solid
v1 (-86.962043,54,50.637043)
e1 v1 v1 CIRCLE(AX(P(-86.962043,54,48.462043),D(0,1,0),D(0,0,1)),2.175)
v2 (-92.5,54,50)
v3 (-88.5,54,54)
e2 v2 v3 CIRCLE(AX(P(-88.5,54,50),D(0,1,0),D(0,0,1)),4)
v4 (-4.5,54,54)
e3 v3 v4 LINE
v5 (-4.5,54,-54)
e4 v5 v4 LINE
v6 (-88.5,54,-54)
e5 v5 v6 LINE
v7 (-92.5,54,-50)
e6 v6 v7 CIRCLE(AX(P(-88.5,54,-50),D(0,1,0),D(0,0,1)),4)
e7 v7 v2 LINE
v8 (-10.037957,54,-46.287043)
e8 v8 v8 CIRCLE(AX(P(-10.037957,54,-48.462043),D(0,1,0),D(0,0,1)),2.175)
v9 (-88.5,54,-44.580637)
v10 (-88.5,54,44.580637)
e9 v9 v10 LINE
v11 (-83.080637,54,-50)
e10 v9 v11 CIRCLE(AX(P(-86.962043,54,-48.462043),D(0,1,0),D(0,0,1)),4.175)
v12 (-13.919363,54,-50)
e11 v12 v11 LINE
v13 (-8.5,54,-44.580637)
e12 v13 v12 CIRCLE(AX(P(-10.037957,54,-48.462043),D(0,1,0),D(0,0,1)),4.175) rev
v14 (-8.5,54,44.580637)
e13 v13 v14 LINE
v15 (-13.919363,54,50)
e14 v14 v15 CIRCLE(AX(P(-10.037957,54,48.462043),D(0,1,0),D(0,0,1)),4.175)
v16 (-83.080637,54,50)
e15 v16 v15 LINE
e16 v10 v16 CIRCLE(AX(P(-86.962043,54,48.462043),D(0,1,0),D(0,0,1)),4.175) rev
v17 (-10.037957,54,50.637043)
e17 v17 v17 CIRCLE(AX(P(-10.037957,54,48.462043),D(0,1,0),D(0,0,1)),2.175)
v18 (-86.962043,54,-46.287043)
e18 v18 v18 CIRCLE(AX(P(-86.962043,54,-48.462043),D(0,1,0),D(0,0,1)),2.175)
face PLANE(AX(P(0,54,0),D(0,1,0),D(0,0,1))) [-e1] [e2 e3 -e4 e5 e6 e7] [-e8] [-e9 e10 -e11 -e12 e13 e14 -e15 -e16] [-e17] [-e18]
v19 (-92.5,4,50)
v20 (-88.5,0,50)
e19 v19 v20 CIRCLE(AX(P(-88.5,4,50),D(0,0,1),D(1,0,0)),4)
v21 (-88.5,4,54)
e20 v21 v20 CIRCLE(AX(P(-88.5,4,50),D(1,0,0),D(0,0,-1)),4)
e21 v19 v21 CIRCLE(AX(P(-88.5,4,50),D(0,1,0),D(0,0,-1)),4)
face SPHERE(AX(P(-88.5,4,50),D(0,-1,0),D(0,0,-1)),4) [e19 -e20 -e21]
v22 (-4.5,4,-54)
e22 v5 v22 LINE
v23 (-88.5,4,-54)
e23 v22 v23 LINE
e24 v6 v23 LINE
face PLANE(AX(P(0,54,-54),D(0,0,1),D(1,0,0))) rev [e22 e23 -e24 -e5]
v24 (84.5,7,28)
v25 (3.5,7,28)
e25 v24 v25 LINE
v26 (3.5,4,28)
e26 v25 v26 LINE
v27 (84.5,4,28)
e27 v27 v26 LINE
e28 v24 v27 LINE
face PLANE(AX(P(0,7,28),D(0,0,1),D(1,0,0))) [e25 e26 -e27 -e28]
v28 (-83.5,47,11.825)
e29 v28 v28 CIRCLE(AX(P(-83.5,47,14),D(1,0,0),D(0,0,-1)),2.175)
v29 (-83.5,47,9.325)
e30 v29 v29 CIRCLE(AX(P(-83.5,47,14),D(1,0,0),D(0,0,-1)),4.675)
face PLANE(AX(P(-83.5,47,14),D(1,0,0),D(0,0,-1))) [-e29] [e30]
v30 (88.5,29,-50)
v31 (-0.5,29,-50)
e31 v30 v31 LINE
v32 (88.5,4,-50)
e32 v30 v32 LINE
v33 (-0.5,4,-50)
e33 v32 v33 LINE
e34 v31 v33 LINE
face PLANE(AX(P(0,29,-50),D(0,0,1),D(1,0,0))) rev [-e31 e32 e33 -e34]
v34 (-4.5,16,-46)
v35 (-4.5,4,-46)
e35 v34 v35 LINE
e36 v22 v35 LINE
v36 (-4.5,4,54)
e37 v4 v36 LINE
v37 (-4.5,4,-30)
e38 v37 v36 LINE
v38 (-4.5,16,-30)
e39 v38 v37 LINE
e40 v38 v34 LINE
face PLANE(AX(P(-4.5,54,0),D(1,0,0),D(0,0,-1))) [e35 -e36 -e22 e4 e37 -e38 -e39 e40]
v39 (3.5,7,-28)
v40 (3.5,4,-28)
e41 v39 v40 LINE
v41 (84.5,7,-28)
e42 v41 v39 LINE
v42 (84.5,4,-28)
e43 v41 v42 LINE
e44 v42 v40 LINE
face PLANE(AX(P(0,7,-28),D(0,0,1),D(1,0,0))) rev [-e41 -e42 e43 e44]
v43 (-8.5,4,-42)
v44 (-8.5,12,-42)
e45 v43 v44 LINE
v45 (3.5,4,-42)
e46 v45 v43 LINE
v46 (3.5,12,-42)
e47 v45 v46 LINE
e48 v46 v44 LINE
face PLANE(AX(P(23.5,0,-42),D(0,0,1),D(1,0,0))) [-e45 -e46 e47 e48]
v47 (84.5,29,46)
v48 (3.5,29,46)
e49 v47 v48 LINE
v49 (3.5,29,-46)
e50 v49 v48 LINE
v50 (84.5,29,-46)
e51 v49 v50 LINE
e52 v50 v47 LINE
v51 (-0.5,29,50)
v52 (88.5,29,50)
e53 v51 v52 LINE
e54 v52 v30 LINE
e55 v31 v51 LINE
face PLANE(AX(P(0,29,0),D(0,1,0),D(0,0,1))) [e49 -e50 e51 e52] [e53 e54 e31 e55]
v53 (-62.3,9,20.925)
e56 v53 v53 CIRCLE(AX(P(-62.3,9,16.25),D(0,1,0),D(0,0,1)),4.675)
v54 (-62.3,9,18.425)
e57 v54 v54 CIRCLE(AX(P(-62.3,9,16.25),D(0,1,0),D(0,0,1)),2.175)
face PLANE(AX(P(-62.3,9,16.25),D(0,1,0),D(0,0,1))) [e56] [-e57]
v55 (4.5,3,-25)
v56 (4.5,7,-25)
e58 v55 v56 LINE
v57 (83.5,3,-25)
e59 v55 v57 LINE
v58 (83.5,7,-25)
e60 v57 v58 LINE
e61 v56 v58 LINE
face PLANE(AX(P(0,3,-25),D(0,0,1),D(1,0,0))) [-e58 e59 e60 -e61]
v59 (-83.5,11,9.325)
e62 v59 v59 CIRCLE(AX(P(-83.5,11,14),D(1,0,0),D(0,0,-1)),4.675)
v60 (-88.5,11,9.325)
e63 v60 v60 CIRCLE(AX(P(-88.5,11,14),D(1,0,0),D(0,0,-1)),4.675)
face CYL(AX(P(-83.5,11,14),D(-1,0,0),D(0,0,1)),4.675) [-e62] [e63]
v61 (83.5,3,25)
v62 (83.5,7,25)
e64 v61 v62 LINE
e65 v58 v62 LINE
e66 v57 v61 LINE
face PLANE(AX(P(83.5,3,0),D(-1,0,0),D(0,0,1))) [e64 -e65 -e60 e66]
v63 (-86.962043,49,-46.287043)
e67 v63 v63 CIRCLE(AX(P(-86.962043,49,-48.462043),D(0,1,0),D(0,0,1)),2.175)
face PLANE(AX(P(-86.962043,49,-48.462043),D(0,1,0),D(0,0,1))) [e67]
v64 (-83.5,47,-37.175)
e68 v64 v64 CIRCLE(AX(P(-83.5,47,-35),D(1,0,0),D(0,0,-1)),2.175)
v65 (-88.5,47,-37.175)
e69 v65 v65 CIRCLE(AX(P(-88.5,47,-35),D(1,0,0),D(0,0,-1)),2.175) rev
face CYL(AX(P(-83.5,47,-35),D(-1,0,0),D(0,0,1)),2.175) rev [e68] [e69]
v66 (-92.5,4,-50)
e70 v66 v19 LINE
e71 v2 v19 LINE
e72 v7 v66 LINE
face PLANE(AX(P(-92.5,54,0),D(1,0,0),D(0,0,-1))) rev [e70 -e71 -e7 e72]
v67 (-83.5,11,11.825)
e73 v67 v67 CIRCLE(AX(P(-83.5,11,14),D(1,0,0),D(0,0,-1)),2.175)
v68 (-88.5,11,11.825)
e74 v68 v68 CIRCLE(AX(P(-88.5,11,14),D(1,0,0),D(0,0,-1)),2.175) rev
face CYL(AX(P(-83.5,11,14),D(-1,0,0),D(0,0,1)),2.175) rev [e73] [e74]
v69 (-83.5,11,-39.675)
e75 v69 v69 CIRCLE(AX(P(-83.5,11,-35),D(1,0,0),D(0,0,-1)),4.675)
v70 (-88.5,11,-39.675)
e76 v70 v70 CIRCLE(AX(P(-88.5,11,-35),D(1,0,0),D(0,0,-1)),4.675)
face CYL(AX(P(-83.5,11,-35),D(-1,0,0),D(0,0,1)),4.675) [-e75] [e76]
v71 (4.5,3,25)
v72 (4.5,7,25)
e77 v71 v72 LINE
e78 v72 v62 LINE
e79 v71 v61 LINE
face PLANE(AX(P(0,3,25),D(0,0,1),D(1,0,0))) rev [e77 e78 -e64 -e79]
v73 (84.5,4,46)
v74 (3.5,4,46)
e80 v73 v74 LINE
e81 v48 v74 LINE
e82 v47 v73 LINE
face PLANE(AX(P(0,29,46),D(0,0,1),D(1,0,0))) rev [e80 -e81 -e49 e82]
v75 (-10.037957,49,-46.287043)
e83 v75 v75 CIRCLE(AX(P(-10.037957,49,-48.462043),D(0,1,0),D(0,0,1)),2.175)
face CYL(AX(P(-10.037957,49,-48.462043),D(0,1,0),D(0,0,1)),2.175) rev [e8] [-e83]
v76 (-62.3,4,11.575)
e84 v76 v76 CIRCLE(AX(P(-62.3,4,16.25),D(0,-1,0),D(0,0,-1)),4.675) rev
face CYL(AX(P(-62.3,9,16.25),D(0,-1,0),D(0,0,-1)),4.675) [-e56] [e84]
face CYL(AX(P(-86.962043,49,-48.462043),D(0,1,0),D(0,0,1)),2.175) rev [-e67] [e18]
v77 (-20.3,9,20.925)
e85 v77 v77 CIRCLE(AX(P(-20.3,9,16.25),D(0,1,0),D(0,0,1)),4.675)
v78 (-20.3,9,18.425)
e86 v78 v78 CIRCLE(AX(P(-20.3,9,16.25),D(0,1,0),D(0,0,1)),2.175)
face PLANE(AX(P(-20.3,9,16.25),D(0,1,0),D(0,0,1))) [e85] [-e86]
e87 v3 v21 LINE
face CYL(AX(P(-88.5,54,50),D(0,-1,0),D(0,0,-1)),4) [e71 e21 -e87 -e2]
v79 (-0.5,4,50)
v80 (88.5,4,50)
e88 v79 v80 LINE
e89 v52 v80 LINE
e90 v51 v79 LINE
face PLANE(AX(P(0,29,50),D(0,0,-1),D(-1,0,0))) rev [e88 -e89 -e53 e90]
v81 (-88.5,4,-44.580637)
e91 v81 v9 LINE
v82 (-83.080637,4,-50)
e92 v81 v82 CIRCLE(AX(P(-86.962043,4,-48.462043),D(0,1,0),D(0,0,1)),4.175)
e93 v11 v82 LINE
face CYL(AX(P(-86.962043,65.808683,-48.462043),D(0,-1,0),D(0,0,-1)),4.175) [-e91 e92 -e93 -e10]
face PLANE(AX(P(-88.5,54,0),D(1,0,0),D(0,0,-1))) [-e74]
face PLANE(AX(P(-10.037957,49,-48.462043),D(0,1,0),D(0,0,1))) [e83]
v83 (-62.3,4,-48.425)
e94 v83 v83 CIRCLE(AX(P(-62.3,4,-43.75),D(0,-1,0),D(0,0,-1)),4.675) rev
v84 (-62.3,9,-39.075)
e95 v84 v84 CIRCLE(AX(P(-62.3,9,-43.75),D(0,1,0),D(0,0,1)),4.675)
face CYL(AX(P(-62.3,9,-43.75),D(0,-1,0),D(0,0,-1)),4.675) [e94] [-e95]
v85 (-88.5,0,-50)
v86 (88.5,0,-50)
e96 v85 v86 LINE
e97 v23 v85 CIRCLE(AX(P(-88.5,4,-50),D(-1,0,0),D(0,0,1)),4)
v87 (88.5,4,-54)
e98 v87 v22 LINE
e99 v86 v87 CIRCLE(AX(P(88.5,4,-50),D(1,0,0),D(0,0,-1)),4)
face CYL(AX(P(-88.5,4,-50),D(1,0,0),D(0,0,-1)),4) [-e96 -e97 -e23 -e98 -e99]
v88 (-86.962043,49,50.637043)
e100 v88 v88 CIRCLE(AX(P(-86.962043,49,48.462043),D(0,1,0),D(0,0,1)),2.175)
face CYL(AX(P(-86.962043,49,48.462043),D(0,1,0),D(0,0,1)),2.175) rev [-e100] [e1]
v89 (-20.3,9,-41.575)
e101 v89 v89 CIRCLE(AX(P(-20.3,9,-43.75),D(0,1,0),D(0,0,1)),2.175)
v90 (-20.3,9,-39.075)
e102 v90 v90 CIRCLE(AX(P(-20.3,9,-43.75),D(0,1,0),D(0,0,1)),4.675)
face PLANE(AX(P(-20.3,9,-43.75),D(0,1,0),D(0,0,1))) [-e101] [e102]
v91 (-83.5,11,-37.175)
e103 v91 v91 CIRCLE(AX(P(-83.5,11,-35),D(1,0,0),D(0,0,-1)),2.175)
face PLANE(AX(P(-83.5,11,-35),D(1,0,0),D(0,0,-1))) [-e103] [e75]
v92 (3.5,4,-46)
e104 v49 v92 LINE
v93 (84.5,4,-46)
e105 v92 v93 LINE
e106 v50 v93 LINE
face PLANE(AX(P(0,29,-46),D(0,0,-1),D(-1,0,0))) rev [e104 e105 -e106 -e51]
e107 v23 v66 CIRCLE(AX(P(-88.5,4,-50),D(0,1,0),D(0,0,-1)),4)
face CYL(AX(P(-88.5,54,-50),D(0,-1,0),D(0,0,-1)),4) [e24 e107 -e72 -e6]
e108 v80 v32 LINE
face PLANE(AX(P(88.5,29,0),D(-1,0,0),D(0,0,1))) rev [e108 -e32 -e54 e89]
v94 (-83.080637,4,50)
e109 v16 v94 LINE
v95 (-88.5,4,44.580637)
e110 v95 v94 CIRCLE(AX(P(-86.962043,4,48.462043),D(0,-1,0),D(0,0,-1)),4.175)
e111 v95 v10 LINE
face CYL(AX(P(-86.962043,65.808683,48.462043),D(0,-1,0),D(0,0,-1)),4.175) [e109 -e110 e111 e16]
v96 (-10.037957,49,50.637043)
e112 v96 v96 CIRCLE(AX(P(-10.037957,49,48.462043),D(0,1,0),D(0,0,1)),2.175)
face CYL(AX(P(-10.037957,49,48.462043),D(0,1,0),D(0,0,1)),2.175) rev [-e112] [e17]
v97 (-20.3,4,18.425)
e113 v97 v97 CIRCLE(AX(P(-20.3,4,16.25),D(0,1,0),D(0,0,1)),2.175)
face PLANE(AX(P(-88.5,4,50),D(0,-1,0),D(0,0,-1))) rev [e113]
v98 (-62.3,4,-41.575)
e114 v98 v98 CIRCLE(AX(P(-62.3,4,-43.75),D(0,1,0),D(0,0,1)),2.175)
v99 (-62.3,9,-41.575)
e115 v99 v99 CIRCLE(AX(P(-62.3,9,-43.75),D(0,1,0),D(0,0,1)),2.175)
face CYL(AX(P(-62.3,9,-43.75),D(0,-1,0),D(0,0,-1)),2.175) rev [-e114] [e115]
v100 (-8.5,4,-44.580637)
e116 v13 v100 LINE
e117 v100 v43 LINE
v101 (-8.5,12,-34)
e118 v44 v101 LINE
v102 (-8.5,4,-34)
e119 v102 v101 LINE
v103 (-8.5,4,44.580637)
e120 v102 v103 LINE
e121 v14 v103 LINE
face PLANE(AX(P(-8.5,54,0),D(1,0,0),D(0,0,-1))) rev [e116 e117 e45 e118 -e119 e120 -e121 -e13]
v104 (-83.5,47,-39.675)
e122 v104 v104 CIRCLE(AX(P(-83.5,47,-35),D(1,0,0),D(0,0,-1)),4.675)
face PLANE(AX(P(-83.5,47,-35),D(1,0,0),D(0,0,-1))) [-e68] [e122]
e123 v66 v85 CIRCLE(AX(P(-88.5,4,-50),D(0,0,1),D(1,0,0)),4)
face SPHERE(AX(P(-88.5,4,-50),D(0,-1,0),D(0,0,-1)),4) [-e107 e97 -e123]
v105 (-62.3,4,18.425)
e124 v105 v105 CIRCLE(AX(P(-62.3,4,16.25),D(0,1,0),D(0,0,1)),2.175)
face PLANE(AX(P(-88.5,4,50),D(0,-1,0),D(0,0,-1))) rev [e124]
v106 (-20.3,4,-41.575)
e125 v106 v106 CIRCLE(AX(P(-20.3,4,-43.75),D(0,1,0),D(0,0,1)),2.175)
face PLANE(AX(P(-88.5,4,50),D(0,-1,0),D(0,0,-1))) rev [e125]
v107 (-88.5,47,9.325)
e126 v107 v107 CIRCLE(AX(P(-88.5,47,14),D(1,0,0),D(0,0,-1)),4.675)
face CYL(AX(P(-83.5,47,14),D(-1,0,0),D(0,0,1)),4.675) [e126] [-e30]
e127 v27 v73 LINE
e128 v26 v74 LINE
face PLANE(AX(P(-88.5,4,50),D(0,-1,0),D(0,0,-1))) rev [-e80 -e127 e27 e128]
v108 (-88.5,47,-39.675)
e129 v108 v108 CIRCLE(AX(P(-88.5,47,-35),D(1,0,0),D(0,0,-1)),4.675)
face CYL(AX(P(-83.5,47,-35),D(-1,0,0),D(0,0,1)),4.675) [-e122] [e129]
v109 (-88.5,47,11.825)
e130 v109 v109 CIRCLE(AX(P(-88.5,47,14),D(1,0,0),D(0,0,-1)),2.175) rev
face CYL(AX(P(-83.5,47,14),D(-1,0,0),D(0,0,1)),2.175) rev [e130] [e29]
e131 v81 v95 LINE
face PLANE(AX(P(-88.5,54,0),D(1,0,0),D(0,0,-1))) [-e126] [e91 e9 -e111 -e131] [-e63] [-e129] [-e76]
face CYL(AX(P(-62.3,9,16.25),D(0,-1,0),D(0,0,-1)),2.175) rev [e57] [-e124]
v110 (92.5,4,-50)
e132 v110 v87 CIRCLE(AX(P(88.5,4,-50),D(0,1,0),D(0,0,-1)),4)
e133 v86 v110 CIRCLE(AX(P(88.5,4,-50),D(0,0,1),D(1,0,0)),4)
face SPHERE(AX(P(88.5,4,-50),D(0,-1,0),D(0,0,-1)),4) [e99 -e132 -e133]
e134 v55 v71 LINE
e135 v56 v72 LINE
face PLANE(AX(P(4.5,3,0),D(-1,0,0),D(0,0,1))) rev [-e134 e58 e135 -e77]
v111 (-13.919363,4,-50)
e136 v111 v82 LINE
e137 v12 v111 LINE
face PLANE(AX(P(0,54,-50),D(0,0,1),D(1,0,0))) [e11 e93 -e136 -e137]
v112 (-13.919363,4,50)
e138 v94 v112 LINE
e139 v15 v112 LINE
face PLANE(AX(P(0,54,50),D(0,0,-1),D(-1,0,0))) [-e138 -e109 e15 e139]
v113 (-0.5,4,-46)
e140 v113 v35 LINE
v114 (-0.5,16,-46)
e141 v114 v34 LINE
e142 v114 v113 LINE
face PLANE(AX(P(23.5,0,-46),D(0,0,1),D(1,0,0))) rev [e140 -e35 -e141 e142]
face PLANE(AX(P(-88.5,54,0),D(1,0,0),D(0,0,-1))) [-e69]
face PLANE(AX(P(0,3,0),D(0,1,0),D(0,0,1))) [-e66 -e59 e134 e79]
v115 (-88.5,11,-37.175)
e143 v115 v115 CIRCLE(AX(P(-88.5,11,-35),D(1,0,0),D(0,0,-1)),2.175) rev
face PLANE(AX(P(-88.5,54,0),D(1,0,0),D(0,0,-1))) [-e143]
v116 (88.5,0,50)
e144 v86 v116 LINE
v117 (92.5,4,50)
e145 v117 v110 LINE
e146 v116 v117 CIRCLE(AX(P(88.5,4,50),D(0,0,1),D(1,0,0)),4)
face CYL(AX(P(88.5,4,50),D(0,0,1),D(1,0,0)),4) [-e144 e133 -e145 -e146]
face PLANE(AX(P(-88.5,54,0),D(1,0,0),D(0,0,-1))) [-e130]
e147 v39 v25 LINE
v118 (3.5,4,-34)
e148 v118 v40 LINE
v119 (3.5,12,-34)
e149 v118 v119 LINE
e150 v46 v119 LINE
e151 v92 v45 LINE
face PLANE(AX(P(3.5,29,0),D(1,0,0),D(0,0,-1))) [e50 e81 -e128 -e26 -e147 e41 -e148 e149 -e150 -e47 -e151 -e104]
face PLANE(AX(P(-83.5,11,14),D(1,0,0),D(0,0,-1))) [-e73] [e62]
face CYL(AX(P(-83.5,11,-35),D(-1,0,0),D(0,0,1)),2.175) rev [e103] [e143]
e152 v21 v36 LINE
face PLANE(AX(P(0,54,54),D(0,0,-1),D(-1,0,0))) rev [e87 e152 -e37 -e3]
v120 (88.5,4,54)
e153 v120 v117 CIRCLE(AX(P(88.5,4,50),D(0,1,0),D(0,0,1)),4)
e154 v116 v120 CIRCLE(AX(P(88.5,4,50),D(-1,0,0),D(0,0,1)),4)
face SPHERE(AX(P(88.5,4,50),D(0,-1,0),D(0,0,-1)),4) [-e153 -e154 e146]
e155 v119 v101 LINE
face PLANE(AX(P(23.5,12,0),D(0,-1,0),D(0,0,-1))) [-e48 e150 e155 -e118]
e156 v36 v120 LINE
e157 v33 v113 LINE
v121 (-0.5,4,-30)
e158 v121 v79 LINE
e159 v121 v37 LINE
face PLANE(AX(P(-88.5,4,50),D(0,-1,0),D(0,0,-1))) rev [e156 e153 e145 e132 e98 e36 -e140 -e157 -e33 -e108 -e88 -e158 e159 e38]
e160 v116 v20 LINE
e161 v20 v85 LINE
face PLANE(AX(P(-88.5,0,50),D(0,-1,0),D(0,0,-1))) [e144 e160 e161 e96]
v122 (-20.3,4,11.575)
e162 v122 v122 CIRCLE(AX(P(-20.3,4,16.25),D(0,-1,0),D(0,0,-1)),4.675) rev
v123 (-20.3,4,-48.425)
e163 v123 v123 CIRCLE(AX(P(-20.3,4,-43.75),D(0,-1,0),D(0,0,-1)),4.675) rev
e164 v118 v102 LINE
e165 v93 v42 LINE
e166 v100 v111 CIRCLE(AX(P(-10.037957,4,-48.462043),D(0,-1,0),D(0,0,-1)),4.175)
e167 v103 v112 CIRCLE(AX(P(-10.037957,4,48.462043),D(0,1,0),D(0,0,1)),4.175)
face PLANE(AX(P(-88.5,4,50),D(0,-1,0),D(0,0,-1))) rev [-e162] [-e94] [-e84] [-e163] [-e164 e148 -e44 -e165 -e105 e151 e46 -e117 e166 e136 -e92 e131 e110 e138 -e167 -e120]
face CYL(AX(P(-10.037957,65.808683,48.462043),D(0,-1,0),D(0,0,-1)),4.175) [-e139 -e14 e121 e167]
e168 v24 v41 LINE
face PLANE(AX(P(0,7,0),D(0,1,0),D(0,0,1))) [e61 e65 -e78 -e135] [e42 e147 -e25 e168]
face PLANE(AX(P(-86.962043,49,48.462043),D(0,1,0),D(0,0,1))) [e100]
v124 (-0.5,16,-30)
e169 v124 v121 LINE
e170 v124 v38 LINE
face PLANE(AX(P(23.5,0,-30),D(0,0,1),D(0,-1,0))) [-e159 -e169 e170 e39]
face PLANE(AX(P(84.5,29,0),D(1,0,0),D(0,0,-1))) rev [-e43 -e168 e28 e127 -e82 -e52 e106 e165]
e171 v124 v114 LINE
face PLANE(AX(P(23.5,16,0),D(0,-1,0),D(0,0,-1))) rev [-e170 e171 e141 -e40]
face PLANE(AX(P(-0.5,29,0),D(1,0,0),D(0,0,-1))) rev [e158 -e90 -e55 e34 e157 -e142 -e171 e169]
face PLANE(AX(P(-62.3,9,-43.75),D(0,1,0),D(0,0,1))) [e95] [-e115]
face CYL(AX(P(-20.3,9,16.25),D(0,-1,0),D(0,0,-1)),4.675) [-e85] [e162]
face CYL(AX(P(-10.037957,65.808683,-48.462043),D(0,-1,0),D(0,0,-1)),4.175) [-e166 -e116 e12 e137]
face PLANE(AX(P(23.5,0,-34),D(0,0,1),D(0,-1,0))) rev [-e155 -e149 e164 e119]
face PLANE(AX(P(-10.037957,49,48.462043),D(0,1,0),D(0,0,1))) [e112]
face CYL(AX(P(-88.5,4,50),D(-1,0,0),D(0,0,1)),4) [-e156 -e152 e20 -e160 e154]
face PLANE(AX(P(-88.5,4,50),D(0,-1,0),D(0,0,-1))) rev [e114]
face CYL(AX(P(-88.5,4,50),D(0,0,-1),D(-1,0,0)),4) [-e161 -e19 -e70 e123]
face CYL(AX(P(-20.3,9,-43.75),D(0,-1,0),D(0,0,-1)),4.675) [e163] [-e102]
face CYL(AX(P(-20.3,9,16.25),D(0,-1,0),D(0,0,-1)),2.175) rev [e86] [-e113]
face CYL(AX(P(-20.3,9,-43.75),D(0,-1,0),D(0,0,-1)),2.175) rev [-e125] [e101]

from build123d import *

# Parameters (mm, degrees)
BOSS_EXTRUDE1_DEPTH = 4
FILLET1_R           = 4
SKETCH4_W           = 4
SKETCH4_H           = 4
SKETCH4_H_2         = 100
BOSS_EXTRUDE2_DEPTH = 50
BOSS_EXTRUDE3_DEPTH = 25
BOSS_EXTRUDE4_DEPTH = 12
SKETCH5_3_W         = 8
SKETCH5_3_H         = 8
CUT_EXTRUDE1_DEPTH  = 12
SKETCH6_W           = 79
SKETCH6_H           = 50
CUT_EXTRUDE2_DEPTH  = 1
SKETCH6_3_W         = 81
SKETCH6_3_H         = 56
SKETCH6_3_W_2       = 79
SKETCH6_3_H_2       = 50
BOSS_EXTRUDE5_DEPTH = 3
SKETCH7_R           = 4.175
BOSS_EXTRUDE6_DEPTH = 50
CUT_EXTRUDE3_START  = 50
SKETCH7_2_R         = 2.175
CUT_EXTRUDE3_DEPTH  = 5
SKETCH9_R           = 4.675
SKETCH9_R_2         = 2.175
BOSS_EXTRUDE7_DEPTH = 5
SKETCH10_R          = 4.675
SKETCH10_R_2        = 2.175
BOSS_EXTRUDE8_DEPTH = 5


with BuildPart() as part:
    # Sketch1 → Boss-Extrude1 (new body)
    with BuildSketch(Plane(origin=(0, 0, 0), x_dir=(1, 0, 0), z_dir=(0, 1, 0))):
        with BuildLine():
            Line((-88.5, -54), (88.5, -54))
            ThreePointArc((88.5, -54), (91.328427125, -52.828427125), (92.5, -50))
            Line((92.5, -50), (92.5, 50))
            ThreePointArc((92.5, 50), (91.328427125, 52.828427125), (88.5, 54))
            Line((88.5, 54), (-88.5, 54))
            ThreePointArc((-88.5, 54), (-91.328427125, 52.828427125), (-92.5, 50))
            Line((-92.5, 50), (-92.5, -50))
            ThreePointArc((-92.5, -50), (-91.328427125, -52.828427125), (-88.5, -54))
        make_face()
    extrude(amount=BOSS_EXTRUDE1_DEPTH)

    # Fillet1
    fillet1_edges = [part.edges().sort_by_distance(p)[0] for p in [
        (0, 0, 54),
        (91.328427125, 0, 52.828427125),
        (92.5, 0, 0),
        (91.328427125, 0, -52.828427125),
        (0, 0, -54),
        (-91.328427125, 0, -52.828427125),
        (-92.5, 0, 0),
        (-91.328427125, 0, 52.828427125),
    ]]
    fillet(fillet1_edges, radius=FILLET1_R - 0.0001)  # a hair under: the kernel refuses the full size

    # Sketch4 → Boss-Extrude2 (add)
    with BuildSketch(Plane(origin=(0, 4, 0), x_dir=(1, 0, 0), z_dir=(0, 1, 0))):
        with BuildLine():
            ThreePointArc((-92.5, -50), (-91.328427125, -52.828427125), (-88.5, -54))
            Line((-88.5, -54), (-8.5, -54))
            Line((-8.5, -54), (-8.5, -50))
            Line((-8.5, -50), (-88.5, -50))
            Line((-88.5, -50), (-88.5, 50))
            Line((-88.5, 50), (-8.5, 50))
            Line((-8.5, 50), (-8.5, 54))
            Line((-8.5, 54), (-88.5, 54))
            ThreePointArc((-88.5, 54), (-91.328427125, 52.828427125), (-92.5, 50))
            Line((-92.5, 50), (-92.5, -50))
        make_face()
        with Locations((-6.5, 52)):
            Rectangle(SKETCH4_W, SKETCH4_H)
        with Locations((-6.5, 0)):
            Rectangle(SKETCH4_W, SKETCH4_H_2)
        with Locations((-6.5, -52)):
            Rectangle(SKETCH4_W, SKETCH4_H)
    extrude(amount=BOSS_EXTRUDE2_DEPTH)

    # Sketch4<3> → Boss-Extrude3 (add)
    with BuildSketch(Plane(origin=(0, 4, 0), x_dir=(1, 0, 0), z_dir=(0, 1, 0))):
        Polygon((-0.5, 50), (-0.5, -50), (3.5, -50), (3.5, -46), (3.5, 46), (3.5, 50), align=None)
        Polygon((3.5, -46), (3.5, -50), (88.5, -50), (88.5, 50), (3.5, 50), (3.5, 46), (84.5, 46), (84.5, -46), align=None)
    extrude(amount=BOSS_EXTRUDE3_DEPTH)

    # Sketch5 → Boss-Extrude4 (add)
    with BuildSketch(Plane.ZY.offset(8.5)):
        Polygon((-46, 4), (-42, 4), (-42, 12), (-34, 12), (-34, 4), (-30, 4), (-30, 16), (-46, 16), align=None)
    extrude(amount=-BOSS_EXTRUDE4_DEPTH)

    # Sketch5<3> → Cut-Extrude1 (cut)
    with BuildSketch(Plane.ZY.offset(8.5)):
        with Locations((-38, 8)):
            Rectangle(SKETCH5_3_W, SKETCH5_3_H)
    extrude(amount=-CUT_EXTRUDE1_DEPTH, mode=Mode.SUBTRACT)

    # Sketch6 → Cut-Extrude2 (cut)
    with BuildSketch(Plane(origin=(0, 4, 0), x_dir=(1, 0, 0), z_dir=(0, 1, 0))):
        with Locations((44, 0)):
            Rectangle(SKETCH6_W, SKETCH6_H)
    extrude(amount=-CUT_EXTRUDE2_DEPTH, mode=Mode.SUBTRACT)

    # Sketch6<3> → Boss-Extrude5 (add)
    with BuildSketch(Plane(origin=(0, 4, 0), x_dir=(1, 0, 0), z_dir=(0, 1, 0))):
        with Locations((44, 0)):
            Rectangle(SKETCH6_3_W, SKETCH6_3_H)
        with Locations((44, 0)):
            Rectangle(SKETCH6_3_W_2, SKETCH6_3_H_2, mode=Mode.SUBTRACT)
    extrude(amount=BOSS_EXTRUDE5_DEPTH)

    # Sketch7 → Boss-Extrude6 (add)
    with BuildSketch(Plane(origin=(0, 4, 0), x_dir=(1, 0, 0), z_dir=(0, 1, 0))):
        with Locations((-86.962042751, 48.462042751)):
            Circle(SKETCH7_R)
        with Locations((-10.037957249, 48.462042751)):
            Circle(SKETCH7_R)
        with Locations((-10.037957249, -48.462042751)):
            Circle(SKETCH7_R)
        with Locations((-86.962042751, -48.462042751)):
            Circle(SKETCH7_R)
    extrude(amount=BOSS_EXTRUDE6_DEPTH)

    # Sketch7<2> → Cut-Extrude3 (cut)
    with BuildSketch(Plane(origin=(0, 4, 0), x_dir=(1, 0, 0), z_dir=(0, 1, 0)).offset(CUT_EXTRUDE3_START)):
        with Locations(Location((-86.962042751, 48.462042751, 0), (0, 0, 270))):
            Circle(SKETCH7_2_R)
        with Locations(Location((-10.037957249, 48.462042751, 0), (0, 0, 270))):
            Circle(SKETCH7_2_R)
        with Locations(Location((-10.037957249, -48.462042751, 0), (0, 0, 270))):
            Circle(SKETCH7_2_R)
        with Locations(Location((-86.962042751, -48.462042751, 0), (0, 0, 270))):
            Circle(SKETCH7_2_R)
    extrude(amount=-CUT_EXTRUDE3_DEPTH, mode=Mode.SUBTRACT)

    # Sketch9 → Boss-Extrude7 (add)
    # profile 1 of 4: a face of its own
    with BuildSketch(Plane(origin=(0, 4, 0), x_dir=(1, 0, 0), z_dir=(0, 1, 0))):
        with Locations(Location((-62.3, 43.75, 0), (0, 0, 90))):
            Circle(SKETCH9_R)
        with Locations(Location((-62.3, 43.75, 0), (0, 0, 270))):
            Circle(SKETCH9_R_2, mode=Mode.SUBTRACT)
    # profile 2 of 4: a face of its own
    with BuildSketch(Plane(origin=(0, 4, 0), x_dir=(1, 0, 0), z_dir=(0, 1, 0))):
        with Locations(Location((-20.3, 43.75, 0), (0, 0, 90))):
            Circle(SKETCH9_R)
        with Locations(Location((-20.3, 43.75, 0), (0, 0, 270))):
            Circle(SKETCH9_R_2, mode=Mode.SUBTRACT)
    # profile 3 of 4: a face of its own
    with BuildSketch(Plane(origin=(0, 4, 0), x_dir=(1, 0, 0), z_dir=(0, 1, 0))):
        with Locations(Location((-62.3, -16.25, 0), (0, 0, 90))):
            Circle(SKETCH9_R)
        with Locations(Location((-62.3, -16.25, 0), (0, 0, 270))):
            Circle(SKETCH9_R_2, mode=Mode.SUBTRACT)
    # profile 4 of 4: a face of its own
    with BuildSketch(Plane(origin=(0, 4, 0), x_dir=(1, 0, 0), z_dir=(0, 1, 0))):
        with Locations(Location((-20.3, -16.25, 0), (0, 0, 90))):
            Circle(SKETCH9_R)
        with Locations(Location((-20.3, -16.25, 0), (0, 0, 270))):
            Circle(SKETCH9_R_2, mode=Mode.SUBTRACT)
    extrude(amount=BOSS_EXTRUDE7_DEPTH)

    # Sketch10 → Boss-Extrude8 (add)
    # profile 1 of 4: a face of its own
    with BuildSketch(Plane(origin=(-88.5, 0, 0), x_dir=(0, 0, -1), z_dir=(1, 0, 0))):
        with Locations((-14, 47)):
            Circle(SKETCH10_R)
        with Locations((-14, 47)):
            Circle(SKETCH10_R_2, mode=Mode.SUBTRACT)
    # profile 2 of 4: a face of its own
    with BuildSketch(Plane(origin=(-88.5, 0, 0), x_dir=(0, 0, -1), z_dir=(1, 0, 0))):
        with Locations((35, 47)):
            Circle(SKETCH10_R)
        with Locations((35, 47)):
            Circle(SKETCH10_R_2, mode=Mode.SUBTRACT)
    # profile 3 of 4: a face of its own
    with BuildSketch(Plane(origin=(-88.5, 0, 0), x_dir=(0, 0, -1), z_dir=(1, 0, 0))):
        with Locations((35, 11)):
            Circle(SKETCH10_R)
        with Locations((35, 11)):
            Circle(SKETCH10_R_2, mode=Mode.SUBTRACT)
    # profile 4 of 4: a face of its own
    with BuildSketch(Plane(origin=(-88.5, 0, 0), x_dir=(0, 0, -1), z_dir=(1, 0, 0))):
        with Locations((-14, 11)):
            Circle(SKETCH10_R)
        with Locations((-14, 11)):
            Circle(SKETCH10_R_2, mode=Mode.SUBTRACT)
    extrude(amount=BOSS_EXTRUDE8_DEPTH)


solid = part.part
